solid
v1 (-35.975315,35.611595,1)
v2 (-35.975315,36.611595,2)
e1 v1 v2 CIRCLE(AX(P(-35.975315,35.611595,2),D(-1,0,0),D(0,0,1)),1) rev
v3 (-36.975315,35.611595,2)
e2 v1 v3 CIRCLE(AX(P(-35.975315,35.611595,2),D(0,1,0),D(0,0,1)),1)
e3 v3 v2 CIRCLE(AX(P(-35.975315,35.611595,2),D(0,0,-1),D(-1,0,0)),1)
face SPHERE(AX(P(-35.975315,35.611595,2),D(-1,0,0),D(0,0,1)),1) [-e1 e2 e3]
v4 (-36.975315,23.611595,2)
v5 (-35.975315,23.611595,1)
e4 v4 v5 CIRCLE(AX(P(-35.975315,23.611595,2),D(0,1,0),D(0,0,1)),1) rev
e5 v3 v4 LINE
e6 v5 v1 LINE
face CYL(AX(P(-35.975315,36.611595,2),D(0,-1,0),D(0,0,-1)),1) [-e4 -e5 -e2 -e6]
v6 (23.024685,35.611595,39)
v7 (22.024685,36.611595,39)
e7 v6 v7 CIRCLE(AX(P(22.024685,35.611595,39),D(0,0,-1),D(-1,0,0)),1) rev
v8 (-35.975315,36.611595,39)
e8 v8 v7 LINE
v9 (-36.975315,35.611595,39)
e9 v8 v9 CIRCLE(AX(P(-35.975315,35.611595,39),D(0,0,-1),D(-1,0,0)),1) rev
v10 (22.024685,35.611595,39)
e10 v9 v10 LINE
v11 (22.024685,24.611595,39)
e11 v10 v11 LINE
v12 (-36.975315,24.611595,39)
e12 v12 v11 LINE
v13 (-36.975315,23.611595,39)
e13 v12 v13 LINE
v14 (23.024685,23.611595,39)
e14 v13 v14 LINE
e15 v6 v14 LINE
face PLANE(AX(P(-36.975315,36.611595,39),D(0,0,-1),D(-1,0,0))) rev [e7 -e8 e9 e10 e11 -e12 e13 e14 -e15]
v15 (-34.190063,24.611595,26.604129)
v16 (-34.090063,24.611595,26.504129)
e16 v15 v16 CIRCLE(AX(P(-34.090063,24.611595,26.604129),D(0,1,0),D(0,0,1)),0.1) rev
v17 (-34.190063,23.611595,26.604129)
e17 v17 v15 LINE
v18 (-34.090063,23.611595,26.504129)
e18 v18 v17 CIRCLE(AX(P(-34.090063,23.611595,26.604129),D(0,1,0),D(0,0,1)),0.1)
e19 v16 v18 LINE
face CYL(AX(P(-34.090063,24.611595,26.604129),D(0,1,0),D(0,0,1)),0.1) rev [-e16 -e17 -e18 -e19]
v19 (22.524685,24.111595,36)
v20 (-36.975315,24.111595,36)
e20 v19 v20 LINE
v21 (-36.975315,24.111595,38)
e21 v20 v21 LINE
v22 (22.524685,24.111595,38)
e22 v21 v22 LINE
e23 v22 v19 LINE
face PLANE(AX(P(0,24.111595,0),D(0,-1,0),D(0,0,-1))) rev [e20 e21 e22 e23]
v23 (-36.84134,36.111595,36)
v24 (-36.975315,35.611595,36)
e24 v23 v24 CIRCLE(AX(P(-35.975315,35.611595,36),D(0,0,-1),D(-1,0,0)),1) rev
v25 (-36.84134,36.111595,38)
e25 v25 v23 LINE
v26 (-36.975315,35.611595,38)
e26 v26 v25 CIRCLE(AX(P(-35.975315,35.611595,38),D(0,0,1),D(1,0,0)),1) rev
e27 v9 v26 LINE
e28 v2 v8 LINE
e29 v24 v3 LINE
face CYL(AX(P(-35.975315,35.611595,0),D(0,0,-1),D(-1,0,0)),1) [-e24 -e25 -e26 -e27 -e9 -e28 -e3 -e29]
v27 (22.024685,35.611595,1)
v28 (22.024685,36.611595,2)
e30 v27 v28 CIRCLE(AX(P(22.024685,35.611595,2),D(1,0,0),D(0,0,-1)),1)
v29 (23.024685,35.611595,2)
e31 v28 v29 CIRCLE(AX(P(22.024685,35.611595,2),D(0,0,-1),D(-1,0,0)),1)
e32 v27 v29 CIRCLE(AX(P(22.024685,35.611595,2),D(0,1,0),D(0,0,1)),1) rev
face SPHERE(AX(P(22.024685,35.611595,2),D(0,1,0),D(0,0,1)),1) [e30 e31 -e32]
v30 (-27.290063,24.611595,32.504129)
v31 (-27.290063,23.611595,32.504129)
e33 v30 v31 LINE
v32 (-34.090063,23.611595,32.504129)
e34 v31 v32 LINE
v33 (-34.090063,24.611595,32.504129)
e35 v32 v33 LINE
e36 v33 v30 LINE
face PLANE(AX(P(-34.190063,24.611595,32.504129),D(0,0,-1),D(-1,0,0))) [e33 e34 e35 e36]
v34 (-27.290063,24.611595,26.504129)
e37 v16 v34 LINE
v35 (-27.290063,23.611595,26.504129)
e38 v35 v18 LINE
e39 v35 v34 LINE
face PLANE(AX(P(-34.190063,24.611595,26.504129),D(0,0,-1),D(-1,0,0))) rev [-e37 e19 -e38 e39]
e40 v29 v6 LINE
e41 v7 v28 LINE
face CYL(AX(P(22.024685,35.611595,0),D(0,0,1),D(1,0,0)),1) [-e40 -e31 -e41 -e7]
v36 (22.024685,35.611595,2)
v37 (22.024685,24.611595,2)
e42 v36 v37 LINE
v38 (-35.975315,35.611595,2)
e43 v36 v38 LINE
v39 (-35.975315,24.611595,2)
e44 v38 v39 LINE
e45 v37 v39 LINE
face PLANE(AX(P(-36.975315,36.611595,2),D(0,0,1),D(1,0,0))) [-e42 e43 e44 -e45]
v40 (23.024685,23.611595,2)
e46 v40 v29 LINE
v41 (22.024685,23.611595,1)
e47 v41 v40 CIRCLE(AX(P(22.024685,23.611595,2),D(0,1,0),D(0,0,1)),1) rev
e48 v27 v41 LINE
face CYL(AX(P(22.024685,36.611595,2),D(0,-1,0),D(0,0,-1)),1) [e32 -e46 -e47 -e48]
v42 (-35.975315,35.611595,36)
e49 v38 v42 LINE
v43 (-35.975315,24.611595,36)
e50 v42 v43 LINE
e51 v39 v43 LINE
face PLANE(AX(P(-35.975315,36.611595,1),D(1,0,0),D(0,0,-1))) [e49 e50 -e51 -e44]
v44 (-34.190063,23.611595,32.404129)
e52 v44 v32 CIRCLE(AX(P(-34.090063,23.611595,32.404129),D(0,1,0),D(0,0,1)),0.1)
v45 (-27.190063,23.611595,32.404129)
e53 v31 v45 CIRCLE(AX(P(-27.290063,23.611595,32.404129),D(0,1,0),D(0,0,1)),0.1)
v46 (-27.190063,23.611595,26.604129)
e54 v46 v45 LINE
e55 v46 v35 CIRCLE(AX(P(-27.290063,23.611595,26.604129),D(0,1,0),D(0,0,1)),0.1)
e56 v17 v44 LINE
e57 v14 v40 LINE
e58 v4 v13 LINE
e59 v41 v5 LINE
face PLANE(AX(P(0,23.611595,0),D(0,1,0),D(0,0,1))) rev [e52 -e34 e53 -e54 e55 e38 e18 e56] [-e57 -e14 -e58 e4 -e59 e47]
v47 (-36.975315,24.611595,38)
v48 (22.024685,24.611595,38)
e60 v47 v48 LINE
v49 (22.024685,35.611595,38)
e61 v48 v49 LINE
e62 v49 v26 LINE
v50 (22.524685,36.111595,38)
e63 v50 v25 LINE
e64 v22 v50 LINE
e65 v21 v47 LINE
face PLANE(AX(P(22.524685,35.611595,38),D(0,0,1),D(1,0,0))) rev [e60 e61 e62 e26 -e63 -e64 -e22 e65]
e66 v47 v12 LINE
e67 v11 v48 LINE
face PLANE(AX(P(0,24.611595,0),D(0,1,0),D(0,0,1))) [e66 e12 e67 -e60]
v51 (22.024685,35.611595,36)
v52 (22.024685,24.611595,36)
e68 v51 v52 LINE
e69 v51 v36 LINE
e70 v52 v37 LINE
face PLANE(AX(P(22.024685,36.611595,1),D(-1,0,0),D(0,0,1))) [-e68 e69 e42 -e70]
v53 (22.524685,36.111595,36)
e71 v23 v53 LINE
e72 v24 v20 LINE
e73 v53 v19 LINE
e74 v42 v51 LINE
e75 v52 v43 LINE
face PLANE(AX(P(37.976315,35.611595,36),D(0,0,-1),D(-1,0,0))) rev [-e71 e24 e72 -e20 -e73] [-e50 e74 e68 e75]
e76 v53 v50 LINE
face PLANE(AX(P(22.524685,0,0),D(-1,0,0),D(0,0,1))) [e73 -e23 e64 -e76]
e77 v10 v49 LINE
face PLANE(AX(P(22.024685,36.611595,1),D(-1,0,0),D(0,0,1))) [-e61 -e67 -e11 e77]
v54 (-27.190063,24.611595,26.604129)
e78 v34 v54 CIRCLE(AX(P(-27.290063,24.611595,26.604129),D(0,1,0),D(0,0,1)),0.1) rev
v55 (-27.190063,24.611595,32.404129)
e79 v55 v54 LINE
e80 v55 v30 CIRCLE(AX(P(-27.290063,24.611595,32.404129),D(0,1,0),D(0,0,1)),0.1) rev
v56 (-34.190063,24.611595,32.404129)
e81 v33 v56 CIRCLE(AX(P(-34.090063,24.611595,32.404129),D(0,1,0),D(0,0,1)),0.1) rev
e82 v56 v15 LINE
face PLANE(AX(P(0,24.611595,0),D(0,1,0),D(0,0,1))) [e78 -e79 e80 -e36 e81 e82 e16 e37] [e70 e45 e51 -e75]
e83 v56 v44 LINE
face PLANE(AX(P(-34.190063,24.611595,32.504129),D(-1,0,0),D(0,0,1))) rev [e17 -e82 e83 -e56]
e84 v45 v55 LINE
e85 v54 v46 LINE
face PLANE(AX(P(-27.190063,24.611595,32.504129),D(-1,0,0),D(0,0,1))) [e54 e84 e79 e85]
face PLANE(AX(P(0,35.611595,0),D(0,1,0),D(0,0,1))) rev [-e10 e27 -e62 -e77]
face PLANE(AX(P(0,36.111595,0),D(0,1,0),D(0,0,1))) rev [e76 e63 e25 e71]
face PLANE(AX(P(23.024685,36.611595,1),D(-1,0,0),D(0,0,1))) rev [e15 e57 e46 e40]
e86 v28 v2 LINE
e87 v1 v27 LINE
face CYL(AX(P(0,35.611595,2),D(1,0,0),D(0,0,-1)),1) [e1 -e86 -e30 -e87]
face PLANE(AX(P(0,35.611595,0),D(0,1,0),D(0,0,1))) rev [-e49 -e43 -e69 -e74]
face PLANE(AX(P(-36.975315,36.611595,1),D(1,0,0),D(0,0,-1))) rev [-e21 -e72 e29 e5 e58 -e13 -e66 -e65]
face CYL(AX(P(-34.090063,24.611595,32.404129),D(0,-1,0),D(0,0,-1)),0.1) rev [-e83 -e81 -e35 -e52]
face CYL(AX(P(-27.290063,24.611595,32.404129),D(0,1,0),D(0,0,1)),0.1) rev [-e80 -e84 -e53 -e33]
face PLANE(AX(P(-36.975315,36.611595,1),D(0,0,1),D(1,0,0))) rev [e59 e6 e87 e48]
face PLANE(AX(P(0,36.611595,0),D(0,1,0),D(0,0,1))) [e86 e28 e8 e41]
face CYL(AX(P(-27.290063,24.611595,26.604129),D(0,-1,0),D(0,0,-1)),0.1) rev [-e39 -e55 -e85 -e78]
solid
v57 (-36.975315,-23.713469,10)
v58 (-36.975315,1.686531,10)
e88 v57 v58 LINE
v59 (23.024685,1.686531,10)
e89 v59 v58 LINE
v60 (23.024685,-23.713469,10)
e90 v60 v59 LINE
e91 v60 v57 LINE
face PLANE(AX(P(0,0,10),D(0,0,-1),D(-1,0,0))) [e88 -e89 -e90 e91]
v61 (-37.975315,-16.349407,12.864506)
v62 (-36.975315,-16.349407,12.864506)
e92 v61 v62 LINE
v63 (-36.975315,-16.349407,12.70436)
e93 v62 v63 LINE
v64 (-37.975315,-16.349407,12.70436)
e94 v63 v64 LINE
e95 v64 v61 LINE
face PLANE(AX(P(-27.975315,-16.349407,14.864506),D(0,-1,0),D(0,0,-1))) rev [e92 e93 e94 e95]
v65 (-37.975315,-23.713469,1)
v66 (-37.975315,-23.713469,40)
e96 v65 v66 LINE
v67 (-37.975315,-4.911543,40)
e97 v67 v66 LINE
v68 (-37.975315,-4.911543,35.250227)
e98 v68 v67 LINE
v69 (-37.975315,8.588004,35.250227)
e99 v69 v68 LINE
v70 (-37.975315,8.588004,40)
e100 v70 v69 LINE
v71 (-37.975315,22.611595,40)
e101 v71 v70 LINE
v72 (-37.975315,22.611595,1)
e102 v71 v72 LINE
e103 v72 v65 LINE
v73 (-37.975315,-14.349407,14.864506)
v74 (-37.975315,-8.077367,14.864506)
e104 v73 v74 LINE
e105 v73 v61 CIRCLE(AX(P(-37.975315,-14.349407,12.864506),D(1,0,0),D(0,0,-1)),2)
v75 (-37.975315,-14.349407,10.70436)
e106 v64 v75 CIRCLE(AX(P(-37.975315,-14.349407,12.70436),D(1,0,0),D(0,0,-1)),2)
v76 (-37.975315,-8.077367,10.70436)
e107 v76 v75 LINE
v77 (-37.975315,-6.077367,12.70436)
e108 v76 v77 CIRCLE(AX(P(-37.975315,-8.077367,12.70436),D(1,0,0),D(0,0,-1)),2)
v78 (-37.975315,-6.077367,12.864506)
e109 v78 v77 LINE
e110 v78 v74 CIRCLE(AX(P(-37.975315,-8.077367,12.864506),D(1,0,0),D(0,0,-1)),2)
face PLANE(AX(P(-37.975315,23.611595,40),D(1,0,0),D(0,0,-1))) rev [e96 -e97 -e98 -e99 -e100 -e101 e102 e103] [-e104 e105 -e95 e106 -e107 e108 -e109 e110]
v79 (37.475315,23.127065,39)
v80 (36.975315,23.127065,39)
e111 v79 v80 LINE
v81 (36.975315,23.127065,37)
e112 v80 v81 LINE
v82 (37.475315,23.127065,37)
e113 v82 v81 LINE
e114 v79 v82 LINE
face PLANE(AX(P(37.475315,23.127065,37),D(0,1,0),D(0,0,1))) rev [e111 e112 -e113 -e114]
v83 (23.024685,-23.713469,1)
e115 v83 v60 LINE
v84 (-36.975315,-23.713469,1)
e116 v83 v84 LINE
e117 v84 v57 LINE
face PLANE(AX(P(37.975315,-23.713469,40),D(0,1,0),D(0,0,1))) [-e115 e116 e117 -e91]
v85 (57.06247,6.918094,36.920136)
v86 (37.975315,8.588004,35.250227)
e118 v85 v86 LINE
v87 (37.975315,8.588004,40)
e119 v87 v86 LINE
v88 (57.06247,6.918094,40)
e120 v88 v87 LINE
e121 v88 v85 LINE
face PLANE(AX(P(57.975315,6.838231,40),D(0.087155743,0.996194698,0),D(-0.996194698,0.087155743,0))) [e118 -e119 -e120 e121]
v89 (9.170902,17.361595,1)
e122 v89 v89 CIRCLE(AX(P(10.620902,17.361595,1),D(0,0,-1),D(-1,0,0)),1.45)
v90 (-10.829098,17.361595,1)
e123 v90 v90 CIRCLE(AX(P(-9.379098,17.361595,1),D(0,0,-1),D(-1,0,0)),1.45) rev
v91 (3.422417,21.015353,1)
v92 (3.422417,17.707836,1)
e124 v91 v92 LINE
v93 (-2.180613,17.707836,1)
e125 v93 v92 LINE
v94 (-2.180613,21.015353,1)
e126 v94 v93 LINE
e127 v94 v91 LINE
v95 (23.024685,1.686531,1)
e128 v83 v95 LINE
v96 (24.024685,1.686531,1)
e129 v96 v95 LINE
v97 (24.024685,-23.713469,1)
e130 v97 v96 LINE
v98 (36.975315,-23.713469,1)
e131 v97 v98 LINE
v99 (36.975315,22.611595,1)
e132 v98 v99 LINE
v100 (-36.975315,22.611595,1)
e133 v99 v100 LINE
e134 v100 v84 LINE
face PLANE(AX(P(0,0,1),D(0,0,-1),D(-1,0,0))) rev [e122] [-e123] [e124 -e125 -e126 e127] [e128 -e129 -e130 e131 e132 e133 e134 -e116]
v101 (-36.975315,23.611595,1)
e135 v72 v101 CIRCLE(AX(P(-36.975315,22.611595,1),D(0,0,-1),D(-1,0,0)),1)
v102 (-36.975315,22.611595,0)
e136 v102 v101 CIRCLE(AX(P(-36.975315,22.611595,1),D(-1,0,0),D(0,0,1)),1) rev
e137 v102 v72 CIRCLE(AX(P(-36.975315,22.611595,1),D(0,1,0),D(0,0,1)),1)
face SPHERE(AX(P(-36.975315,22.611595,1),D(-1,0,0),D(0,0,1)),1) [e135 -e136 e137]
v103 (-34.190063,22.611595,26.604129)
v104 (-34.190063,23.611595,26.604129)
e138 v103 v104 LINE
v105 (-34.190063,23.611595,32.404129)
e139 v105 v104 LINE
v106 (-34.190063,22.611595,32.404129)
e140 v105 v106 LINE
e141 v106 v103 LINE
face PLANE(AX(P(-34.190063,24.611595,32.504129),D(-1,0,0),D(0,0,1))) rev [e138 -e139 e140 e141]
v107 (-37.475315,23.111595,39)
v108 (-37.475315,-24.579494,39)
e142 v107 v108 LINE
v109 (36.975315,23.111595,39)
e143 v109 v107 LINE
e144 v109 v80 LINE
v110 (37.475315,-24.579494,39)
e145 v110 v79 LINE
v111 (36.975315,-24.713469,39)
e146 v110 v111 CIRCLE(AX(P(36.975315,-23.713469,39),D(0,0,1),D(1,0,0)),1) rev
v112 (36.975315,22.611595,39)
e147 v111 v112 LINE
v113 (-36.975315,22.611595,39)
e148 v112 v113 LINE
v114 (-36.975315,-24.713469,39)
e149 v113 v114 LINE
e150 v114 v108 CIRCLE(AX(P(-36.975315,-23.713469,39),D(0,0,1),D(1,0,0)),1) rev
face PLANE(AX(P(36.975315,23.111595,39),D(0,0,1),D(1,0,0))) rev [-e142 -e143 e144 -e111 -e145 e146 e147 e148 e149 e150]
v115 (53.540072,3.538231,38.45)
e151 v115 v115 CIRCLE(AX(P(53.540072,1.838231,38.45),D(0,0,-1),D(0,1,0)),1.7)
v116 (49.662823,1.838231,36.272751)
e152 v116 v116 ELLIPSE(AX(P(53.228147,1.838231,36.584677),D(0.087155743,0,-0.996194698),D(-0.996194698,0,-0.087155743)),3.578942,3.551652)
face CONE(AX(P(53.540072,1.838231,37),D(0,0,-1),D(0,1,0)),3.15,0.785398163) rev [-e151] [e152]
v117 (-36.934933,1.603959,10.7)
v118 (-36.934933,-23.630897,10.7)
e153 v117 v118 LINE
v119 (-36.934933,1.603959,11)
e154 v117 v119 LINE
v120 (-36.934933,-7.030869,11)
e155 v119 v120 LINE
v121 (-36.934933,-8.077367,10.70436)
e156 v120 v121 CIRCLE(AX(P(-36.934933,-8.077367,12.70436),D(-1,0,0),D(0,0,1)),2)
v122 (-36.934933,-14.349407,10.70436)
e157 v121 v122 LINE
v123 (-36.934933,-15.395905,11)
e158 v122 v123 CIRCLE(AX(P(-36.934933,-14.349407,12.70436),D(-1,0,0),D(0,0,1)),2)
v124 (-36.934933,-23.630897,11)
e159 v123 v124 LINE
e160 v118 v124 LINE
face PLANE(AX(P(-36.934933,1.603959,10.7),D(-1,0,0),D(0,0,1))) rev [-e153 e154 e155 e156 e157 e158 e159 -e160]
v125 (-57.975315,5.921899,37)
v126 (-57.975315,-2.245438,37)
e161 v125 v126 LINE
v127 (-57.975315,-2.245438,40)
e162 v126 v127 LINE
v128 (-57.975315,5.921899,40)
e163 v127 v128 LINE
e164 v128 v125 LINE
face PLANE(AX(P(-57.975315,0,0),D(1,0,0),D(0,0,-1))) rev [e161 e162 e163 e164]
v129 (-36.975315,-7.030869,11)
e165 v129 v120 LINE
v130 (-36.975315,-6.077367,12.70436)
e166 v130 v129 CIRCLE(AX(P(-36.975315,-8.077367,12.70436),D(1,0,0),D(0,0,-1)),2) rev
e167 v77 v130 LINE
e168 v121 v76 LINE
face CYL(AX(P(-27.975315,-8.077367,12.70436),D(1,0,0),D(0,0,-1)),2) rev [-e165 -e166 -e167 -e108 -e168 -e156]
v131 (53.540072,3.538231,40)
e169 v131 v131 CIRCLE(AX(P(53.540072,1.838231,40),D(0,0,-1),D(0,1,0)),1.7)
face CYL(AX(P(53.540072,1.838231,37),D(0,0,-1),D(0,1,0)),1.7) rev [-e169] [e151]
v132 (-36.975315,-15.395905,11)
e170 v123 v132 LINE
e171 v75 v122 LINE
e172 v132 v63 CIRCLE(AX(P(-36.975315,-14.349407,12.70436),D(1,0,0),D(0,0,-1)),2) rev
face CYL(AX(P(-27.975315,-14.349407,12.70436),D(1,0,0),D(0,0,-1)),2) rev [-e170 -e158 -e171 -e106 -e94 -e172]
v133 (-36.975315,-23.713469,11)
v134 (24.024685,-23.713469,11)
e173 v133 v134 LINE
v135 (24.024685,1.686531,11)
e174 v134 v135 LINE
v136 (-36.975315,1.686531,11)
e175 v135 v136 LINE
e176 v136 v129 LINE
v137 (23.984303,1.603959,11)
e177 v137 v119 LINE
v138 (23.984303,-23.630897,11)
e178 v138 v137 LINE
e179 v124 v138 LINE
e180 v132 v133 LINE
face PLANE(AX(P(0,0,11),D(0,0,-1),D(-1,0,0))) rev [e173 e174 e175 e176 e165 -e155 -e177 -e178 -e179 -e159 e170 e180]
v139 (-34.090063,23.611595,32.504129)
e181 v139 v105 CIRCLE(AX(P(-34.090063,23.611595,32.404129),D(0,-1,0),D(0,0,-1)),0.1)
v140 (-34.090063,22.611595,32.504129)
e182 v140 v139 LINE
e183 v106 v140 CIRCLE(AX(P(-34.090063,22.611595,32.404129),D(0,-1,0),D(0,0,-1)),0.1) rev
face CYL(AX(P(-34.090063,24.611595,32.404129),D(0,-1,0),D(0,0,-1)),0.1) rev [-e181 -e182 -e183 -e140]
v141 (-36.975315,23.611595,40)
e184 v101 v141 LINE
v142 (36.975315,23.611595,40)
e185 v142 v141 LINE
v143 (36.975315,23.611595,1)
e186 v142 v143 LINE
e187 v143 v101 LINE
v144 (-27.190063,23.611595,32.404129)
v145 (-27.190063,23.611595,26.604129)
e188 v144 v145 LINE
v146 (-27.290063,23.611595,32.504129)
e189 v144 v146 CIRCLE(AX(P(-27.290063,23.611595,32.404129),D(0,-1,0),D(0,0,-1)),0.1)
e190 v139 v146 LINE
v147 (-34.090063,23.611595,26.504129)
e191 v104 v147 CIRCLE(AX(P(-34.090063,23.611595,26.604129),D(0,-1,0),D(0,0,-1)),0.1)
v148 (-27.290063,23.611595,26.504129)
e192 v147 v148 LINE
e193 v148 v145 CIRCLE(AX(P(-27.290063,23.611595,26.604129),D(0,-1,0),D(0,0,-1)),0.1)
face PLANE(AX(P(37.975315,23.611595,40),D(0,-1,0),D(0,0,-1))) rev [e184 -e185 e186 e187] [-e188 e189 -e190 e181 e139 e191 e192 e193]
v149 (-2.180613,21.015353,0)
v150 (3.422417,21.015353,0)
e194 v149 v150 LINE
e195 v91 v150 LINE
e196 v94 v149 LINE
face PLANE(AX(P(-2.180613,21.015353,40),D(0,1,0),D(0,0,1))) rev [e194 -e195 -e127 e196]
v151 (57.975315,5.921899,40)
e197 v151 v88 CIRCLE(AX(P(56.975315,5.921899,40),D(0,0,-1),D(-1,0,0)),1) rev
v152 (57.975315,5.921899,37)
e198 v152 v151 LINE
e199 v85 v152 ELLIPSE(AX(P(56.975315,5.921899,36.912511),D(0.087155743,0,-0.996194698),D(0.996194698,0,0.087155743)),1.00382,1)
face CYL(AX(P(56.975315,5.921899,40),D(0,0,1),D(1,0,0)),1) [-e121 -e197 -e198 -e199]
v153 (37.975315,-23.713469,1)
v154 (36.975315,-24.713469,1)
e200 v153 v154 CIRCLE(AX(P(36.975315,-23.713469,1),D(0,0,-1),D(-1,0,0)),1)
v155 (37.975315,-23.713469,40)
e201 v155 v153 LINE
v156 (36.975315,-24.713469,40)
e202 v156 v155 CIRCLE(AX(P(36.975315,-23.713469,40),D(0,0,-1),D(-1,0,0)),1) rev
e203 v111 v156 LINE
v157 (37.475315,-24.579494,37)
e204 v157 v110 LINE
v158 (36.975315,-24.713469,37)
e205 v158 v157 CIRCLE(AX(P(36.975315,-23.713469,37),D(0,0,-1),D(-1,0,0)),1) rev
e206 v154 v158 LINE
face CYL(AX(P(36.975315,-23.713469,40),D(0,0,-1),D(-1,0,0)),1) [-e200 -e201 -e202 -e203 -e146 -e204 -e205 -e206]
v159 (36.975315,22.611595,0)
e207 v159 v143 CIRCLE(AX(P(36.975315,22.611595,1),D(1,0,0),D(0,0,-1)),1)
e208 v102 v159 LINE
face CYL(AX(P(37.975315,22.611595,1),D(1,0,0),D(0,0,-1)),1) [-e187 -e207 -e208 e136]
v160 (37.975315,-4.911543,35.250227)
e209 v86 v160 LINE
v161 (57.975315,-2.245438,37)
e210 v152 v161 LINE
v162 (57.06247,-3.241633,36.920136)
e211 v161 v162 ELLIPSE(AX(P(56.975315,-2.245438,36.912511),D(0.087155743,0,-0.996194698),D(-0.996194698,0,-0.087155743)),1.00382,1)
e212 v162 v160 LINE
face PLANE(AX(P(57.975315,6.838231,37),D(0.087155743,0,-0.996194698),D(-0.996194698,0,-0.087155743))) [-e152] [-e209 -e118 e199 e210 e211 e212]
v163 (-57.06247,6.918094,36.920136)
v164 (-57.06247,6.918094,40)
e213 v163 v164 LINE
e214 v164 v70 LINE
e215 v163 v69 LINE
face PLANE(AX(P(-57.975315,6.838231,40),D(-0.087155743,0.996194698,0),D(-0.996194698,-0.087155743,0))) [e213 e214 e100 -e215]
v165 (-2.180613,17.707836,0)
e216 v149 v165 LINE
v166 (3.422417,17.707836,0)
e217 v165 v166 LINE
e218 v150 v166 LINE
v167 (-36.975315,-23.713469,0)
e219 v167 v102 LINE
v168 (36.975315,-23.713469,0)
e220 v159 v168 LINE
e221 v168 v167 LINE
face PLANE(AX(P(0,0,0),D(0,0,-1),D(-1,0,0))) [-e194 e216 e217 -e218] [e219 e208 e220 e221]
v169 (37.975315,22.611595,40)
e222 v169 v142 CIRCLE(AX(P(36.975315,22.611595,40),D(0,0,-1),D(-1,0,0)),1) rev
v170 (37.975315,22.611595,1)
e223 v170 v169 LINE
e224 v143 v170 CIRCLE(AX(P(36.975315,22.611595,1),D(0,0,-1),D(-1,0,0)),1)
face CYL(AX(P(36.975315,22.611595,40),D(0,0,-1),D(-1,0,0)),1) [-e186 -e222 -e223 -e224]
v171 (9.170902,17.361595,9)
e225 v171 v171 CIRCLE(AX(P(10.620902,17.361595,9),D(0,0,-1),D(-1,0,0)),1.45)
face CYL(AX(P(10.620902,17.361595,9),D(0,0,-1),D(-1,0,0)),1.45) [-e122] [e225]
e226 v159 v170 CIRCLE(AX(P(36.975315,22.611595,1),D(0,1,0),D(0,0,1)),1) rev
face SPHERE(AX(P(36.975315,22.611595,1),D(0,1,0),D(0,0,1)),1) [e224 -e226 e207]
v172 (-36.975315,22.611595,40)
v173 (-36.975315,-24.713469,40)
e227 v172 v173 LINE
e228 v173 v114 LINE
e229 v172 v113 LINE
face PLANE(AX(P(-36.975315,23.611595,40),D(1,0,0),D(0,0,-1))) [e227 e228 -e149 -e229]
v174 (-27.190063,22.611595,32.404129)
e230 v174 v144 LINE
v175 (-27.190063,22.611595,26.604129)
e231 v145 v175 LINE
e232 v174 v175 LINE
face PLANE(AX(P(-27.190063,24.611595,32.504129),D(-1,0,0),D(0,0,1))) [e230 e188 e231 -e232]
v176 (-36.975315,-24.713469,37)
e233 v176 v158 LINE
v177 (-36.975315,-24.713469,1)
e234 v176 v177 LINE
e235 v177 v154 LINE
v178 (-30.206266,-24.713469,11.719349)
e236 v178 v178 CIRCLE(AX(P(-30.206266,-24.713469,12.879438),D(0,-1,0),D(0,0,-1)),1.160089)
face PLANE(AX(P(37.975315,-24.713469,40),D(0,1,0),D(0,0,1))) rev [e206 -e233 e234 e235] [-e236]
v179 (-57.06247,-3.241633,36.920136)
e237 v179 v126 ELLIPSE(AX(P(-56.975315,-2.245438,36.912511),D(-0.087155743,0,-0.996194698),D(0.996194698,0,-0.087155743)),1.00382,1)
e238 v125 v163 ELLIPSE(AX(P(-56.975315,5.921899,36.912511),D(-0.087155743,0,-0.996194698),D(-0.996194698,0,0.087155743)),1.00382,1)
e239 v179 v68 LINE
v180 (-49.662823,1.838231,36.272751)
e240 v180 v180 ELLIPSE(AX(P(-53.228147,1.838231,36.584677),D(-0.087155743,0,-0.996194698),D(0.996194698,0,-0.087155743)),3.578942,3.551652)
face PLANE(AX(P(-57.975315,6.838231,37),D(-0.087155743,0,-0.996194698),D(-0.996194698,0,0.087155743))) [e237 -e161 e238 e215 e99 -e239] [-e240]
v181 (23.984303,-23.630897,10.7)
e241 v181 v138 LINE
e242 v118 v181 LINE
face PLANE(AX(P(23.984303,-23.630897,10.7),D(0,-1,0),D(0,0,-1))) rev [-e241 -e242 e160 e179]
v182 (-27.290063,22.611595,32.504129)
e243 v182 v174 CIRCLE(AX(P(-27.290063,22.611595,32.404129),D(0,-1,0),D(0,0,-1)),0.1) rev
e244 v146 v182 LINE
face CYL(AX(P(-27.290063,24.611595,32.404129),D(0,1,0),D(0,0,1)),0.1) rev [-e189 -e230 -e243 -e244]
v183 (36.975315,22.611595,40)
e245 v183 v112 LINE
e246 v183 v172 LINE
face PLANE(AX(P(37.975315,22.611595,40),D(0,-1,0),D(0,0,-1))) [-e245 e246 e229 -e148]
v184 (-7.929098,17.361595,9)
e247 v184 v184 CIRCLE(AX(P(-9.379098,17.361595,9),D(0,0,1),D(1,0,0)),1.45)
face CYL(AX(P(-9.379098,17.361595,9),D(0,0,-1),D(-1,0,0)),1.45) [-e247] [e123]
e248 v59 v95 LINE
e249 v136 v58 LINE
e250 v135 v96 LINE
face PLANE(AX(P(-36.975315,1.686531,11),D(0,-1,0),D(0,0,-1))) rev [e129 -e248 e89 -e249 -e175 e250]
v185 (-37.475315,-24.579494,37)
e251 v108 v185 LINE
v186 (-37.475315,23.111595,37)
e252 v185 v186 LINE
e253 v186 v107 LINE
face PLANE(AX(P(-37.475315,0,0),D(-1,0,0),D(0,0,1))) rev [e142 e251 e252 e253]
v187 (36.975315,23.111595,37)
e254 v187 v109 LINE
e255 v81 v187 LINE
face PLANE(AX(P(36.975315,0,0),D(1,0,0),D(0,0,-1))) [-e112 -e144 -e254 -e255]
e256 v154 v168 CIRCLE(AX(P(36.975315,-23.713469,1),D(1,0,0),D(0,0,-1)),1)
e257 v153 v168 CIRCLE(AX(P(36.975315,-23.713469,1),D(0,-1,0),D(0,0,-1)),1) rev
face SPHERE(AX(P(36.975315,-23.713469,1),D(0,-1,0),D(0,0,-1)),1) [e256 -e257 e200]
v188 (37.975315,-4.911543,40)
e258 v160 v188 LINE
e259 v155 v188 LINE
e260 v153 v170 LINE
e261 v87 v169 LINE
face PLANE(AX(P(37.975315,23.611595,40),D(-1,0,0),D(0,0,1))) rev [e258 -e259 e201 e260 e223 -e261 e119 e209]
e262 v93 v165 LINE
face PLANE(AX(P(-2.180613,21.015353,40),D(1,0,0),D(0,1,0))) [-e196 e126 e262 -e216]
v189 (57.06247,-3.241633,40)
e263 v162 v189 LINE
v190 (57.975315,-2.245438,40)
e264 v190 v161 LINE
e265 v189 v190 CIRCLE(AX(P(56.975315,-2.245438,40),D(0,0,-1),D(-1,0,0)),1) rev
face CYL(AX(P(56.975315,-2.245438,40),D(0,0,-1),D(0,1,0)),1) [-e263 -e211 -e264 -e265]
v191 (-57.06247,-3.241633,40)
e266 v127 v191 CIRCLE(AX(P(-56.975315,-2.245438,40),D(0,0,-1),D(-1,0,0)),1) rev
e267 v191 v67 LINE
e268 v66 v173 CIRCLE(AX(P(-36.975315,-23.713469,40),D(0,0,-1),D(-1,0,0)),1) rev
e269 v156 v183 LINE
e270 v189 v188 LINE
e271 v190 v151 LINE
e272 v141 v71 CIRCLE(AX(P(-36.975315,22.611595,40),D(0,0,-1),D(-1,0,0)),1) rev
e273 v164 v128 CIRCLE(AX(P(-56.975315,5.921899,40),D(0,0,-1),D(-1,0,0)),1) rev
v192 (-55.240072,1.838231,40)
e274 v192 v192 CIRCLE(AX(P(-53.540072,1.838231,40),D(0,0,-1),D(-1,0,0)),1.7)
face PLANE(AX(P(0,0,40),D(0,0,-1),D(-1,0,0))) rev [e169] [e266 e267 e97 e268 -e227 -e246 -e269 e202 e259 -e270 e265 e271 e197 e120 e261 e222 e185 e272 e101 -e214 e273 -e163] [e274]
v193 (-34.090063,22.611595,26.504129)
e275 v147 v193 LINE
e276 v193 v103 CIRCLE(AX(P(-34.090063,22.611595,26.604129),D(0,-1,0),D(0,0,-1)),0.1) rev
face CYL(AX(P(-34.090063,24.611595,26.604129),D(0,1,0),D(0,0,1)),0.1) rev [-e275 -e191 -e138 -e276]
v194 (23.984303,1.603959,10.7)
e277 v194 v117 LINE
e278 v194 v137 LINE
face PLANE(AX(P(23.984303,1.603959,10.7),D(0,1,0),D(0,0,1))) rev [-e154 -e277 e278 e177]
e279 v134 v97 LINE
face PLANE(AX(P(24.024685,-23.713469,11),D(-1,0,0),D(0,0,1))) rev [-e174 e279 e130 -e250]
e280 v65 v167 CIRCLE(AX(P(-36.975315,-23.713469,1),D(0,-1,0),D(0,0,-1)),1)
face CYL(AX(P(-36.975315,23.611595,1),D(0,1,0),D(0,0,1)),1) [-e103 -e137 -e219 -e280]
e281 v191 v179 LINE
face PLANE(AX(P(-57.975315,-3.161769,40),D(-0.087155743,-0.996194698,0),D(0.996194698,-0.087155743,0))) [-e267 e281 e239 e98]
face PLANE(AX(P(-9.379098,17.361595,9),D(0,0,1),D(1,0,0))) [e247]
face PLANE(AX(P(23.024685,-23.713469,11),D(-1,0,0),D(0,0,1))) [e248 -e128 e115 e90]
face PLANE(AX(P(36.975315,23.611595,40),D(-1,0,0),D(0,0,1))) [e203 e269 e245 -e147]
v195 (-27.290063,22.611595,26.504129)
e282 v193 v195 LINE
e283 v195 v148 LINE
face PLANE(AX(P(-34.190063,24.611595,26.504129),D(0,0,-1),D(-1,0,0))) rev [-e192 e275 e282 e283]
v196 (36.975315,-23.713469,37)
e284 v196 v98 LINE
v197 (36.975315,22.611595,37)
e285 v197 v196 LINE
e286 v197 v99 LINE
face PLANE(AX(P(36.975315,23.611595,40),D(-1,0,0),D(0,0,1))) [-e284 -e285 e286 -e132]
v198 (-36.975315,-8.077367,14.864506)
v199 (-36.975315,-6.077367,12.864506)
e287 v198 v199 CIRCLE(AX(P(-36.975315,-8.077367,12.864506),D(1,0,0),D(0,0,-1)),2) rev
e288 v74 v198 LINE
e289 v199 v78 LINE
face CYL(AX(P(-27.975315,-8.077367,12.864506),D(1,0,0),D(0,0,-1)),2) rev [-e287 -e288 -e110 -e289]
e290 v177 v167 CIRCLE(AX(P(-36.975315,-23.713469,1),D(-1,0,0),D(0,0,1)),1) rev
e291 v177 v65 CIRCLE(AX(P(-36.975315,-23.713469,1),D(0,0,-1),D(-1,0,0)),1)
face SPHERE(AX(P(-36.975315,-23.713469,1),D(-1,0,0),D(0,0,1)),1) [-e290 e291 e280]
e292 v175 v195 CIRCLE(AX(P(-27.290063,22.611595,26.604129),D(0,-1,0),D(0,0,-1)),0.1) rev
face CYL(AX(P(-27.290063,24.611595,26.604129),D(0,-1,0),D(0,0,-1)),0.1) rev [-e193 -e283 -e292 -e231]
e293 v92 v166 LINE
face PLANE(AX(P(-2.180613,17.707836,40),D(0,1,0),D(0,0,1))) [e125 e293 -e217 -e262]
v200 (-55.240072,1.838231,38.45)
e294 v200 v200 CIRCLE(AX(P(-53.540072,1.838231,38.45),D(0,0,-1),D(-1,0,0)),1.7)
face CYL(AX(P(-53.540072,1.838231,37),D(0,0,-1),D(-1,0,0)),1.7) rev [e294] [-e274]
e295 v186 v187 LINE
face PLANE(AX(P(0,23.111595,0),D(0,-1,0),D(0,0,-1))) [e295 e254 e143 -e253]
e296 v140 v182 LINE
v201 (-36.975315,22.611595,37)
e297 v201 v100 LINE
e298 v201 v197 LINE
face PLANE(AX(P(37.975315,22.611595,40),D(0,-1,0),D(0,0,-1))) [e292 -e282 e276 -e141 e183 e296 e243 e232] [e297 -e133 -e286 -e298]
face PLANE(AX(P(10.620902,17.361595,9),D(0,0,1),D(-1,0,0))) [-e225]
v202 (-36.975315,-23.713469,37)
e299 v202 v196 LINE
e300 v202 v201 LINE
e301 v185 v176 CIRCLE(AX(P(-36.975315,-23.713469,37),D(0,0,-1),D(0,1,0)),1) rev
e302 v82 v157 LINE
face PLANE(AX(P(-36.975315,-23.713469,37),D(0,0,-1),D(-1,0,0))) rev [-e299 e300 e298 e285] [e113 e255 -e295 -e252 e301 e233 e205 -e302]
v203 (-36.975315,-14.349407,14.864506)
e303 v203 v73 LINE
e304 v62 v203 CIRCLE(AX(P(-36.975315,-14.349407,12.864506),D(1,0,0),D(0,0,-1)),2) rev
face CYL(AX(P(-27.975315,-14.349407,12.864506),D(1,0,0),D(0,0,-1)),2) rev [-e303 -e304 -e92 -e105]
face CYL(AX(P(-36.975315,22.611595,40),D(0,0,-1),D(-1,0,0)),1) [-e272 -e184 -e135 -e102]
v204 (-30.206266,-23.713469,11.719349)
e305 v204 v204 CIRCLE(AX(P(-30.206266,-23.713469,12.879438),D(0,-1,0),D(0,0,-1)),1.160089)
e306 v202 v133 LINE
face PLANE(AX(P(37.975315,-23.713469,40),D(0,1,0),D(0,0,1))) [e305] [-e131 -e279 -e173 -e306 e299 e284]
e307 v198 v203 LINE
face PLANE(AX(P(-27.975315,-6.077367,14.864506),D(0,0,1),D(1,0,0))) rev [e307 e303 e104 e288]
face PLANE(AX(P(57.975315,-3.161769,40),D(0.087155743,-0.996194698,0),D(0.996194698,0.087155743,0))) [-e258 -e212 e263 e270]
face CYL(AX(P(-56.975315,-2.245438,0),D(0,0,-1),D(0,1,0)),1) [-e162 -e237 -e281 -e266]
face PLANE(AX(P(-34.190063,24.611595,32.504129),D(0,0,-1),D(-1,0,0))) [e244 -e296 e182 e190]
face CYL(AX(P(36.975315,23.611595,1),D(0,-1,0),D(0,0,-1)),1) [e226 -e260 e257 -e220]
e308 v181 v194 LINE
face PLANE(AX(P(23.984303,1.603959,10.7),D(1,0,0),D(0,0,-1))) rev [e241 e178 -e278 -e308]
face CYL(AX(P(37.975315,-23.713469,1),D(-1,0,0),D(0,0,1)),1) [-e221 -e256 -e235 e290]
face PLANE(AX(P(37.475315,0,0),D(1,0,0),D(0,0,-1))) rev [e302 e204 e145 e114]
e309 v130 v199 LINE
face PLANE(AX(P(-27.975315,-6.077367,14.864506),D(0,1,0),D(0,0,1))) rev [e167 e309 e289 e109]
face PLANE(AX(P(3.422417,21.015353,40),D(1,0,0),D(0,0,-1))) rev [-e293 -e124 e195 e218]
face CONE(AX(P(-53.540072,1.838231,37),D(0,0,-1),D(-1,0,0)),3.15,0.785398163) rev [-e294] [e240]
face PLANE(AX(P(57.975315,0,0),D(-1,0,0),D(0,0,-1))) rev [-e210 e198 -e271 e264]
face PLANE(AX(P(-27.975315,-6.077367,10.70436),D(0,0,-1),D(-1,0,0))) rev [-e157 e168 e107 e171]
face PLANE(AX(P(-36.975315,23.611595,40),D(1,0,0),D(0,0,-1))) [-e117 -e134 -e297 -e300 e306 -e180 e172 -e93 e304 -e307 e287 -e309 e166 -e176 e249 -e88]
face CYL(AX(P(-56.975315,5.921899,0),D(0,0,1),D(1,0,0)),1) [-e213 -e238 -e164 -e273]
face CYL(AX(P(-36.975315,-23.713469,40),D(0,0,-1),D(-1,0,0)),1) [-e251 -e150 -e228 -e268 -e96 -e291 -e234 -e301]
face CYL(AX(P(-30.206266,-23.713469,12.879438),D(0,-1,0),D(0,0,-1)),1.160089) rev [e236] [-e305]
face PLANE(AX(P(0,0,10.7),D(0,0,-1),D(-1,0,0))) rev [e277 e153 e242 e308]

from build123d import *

# Parameters (mm, degrees)
ESQUISSE2_W                     = 75.950629162
ESQUISSE2_H                     = 48.325063529
BOSS_EXTRU_1_DEPTH              = 40
COQUE1_T                        = -1
CONG_6_R                        = 1
ESQUISSE3_W                     = 61
ESQUISSE3_H                     = 25.4
BOSS_EXTRU_2_DEPTH              = 10
COQUE3_START                    = -36.975314581
COQUE3_OUTLINE_W                = 25.4
COQUE3_OUTLINE_H                = 9
COQUE3_DEPTH                    = 60
ESQUISSE7_W                     = 60.919236105
ESQUISSE7_H                     = 25.234856741
ENL_V_MAT_EXTRU_3_DEPTH         = 0.3
ESQUISSE8_W                     = 5.603030018
ESQUISSE8_H                     = 3.307516655
ENL_V_MAT_EXTRU_4_DEPTH         = 61.439060764
ESQUISSE9_R                     = 1.45
BOSS_EXTRU_3_DEPTH              = 8
ESQUISSE11_W                    = 60
ESQUISSE11_H                    = 38
BOSS_EXTRU_4_DEPTH              = 13
COQUE7_T                        = -1
ESQUISSE12_W                    = 7
ESQUISSE12_H                    = 6
ENL_V_MAT_EXTRU_6_DEPTH         = 2
CONG_7_R                        = 0.1
CONG_9_R                        = 1
ESQUISSE14_W                    = 73.950629162
ESQUISSE14_H                    = 3
ENL_V_MAT_EXTRU_8_DEPTH         = 1
ESQUISSE18_W                    = 73.950629162
ESQUISSE18_H                    = 2
ENL_V_MAT_EXTRU_13_DEPTH        = 0.5
ESQUISSE19_W                    = 2
ESQUISSE19_H                    = 47.83
ENL_V_MAT_EXTRU_14_DEPTH        = 0.5
ESQUISSE20_W                    = 2
ESQUISSE20_H                    = 47.840534211
ENL_V_MAT_EXTRU_17_DEPTH        = 0.5
ESQUISSE21_W                    = 3
ESQUISSE21_H                    = 11
ENL_V_MAT_EXTRU_18_DEPTH        = 1
ESQUISSE25_W                    = 2
ESQUISSE25_H                    = 11
ENL_V_MAT_EXTRU_19_DEPTH        = 0.5
ESQUISSE26_W                    = 59.5
ESQUISSE26_H                    = 2
ENL_V_MAT_EXTRU_20_DEPTH        = 0.5
ESQUISSE28_W                    = 4.16014579
ESQUISSE28_H                    = 10.272040455
ENL_V_MAT_EXTRU_22_DEPTH        = 10
CONG_10_R                       = 2
ESQUISSE30_W                    = 3
ESQUISSE30_H                    = 10
BOSS_EXTRU_5_DEPTH              = 20
D_POUILLE4_ANGLE                = 5
CONG_11_R                       = 1
D_POUILLE4_OF_SYM_TRIE4_2_ANGLE = 5
CONG_11_OF_SYM_TRIE4_R          = 1
ESQUISSE43_W                    = 59.5
ESQUISSE43_H                    = 2
ENL_V_MAT_EXTRU_23_DEPTH        = 0.5
CONG_12_R                       = 0.1
ESQUISSE50_R                    = 1.160088801
ENL_V_MAT_EXTRU_26_DEPTH        = 1


# Read off the part's stored shape, not the designer's step: Coque3
with BuildPart() as part:
    # Esquisse2 → Boss.-Extru.1 (new body)
    with BuildSketch(Plane.XY):
        with Locations((0, -0.550937207)):
            Rectangle(ESQUISSE2_W, ESQUISSE2_H)
    extrude(amount=BOSS_EXTRU_1_DEPTH)

    # Coque1
    coque1_openings = [part.faces().sort_by_distance(p)[0] for p in [
        (0, -0.550937206, 40),
    ]]
    offset(amount=COQUE1_T, openings=coque1_openings, kind=Kind.INTERSECTION)

    # Congé6
    cong_6_edges = [part.edges().sort_by_distance(p)[0] for p in [
        (0, 23.611594558, 0),
        (37.975314581, -0.550937206, 0),
        (0, -24.713468971, 0),
        (-37.975314581, -0.550937206, 0),
        (-37.975314581, 23.611594558, 20),
        (37.975314581, 23.611594558, 20),
        (37.975314581, -24.713468971, 20),
        (-37.975314581, -24.713468971, 20),
    ]]
    fillet(cong_6_edges, radius=CONG_6_R)

    # Esquisse3 → Boss.-Extru.2 (add)
    with BuildSketch(Plane.XY.offset(1)):
        with Locations((-6.475314581, -11.013468971)):
            Rectangle(ESQUISSE3_W, ESQUISSE3_H)
    extrude(amount=BOSS_EXTRU_2_DEPTH)

    # Coque3 outline → Coque3 (cut)
    with BuildSketch(Plane.YZ.offset(COQUE3_START)):
        with Locations((-11.013468971, 5.5)):
            Rectangle(COQUE3_OUTLINE_W, COQUE3_OUTLINE_H)
    extrude(amount=COQUE3_DEPTH, mode=Mode.SUBTRACT)

    # Esquisse7 → Enlèv. mat.-Extru.3 (cut)
    with BuildSketch(Plane.XY.offset(11)):
        with Locations((-6.475314581, -11.01346897)):
            Rectangle(ESQUISSE7_W, ESQUISSE7_H)
    extrude(amount=-ENL_V_MAT_EXTRU_3_DEPTH, mode=Mode.SUBTRACT)

    # Esquisse8 → Enlèv. mat.-Extru.4 (cut, through all)
    with BuildSketch(Plane(origin=(0, 0, 0), x_dir=(-1, 0, 0), z_dir=(0, 0, -1))):
        with Locations((-0.620902428, 19.361594558)):
            Rectangle(ESQUISSE8_W, ESQUISSE8_H)
    extrude(amount=-ENL_V_MAT_EXTRU_4_DEPTH, mode=Mode.SUBTRACT)

    # Esquisse9 → Boss.-Extru.3 (add)
    with BuildSketch(Plane.XY.offset(1)):
        with Locations(Location((-9.379097572, 17.361594558, 0), (0, 0, 180))):
            Circle(ESQUISSE9_R)
    boss_extru_3 = extrude(amount=BOSS_EXTRU_3_DEPTH)

    # Symétrie2: Boss.-Extru.3 across plane
    add(boss_extru_3.mirror(Plane.ZY.offset(-0.620902428)))


with BuildPart() as body_2:
    # Esquisse11 → Boss.-Extru.4 (new body)
    with BuildSketch(Plane(origin=(0, 23.611594558, 0), x_dir=(1, 0, 0), z_dir=(0, 1, 0))):
        with Locations((-6.975314581, -20)):
            Rectangle(ESQUISSE11_W, ESQUISSE11_H)
    extrude(amount=BOSS_EXTRU_4_DEPTH)

    # Coque7
    coque7_openings = [body_2.faces().sort_by_distance(p)[0] for p in [
        (-6.975314581, 30.111594558, 39),
    ]]
    offset(amount=COQUE7_T, openings=coque7_openings, kind=Kind.INTERSECTION)


with BuildPart() as enl_v_mat_extru_6_tool:
    # Esquisse12 → Enlèv. mat.-Extru.6 (new body)
    with BuildSketch(Plane.XZ.offset(-22.611594558)):
        with Locations((-30.6900627, 29.504129392)):
            Rectangle(ESQUISSE12_W, ESQUISSE12_H)
    extrude(amount=-ENL_V_MAT_EXTRU_6_DEPTH)


with BuildPart() as part_1:
    add(part.part)

    # Enlèv. mat.-Extru.6: cut by enl_v_mat_extru_6_tool
    add(enl_v_mat_extru_6_tool.part, mode=Mode.SUBTRACT)

    # Congé7
    cong_7_edges = [part_1.edges().sort_by_distance(p)[0] for p in [
        (-27.1900627, 23.111594558, 26.504129392),
        (-34.1900627, 23.111594558, 26.504129392),
        (-34.1900627, 23.111594558, 32.504129392),
        (-27.1900627, 23.111594558, 32.504129392),
    ]]
    fillet(cong_7_edges, radius=CONG_7_R)

    # Esquisse14 → Enlèv. mat.-Extru.8 (cut)
    with BuildSketch(Plane(origin=(0, -24.713468971, 0), x_dir=(-1, 0, 0), z_dir=(0, -1, 0))):
        with Locations((0, -38.5)):
            Rectangle(ESQUISSE14_W, ESQUISSE14_H)
    extrude(amount=-ENL_V_MAT_EXTRU_8_DEPTH, mode=Mode.SUBTRACT)

    # Esquisse18 → Enlèv. mat.-Extru.13 (cut)
    with BuildSketch(Plane(origin=(0, 22.611594558, 0), x_dir=(-1, 0, 0), z_dir=(0, -1, 0))):
        with Locations((0, -38)):
            Rectangle(ESQUISSE18_W, ESQUISSE18_H)
    extrude(amount=-ENL_V_MAT_EXTRU_13_DEPTH, mode=Mode.SUBTRACT)

    # Esquisse19 → Enlèv. mat.-Extru.14 (cut)
    with BuildSketch(Plane(origin=(-36.975314581, 0, 0), x_dir=(0, 0, -1), z_dir=(1, 0, 0))):
        with Locations((-38, -0.803405442)):
            Rectangle(ESQUISSE19_W, ESQUISSE19_H)
    extrude(amount=-ENL_V_MAT_EXTRU_14_DEPTH, mode=Mode.SUBTRACT)

    # Esquisse20 → Enlèv. mat.-Extru.17 (cut)
    with BuildSketch(Plane.ZY.offset(-36.975314581)):
        with Locations((38, -0.793201866)):
            Rectangle(ESQUISSE20_W, ESQUISSE20_H)
    extrude(amount=-ENL_V_MAT_EXTRU_17_DEPTH, mode=Mode.SUBTRACT)

    # Esquisse28 → Enlèv. mat.-Extru.22 (cut)
    with BuildSketch(Plane.ZY.offset(37.975314581)):
        with Locations((12.784432773, -11.213387035)):
            Rectangle(ESQUISSE28_W, ESQUISSE28_H)
    extrude(amount=-ENL_V_MAT_EXTRU_22_DEPTH, mode=Mode.SUBTRACT)

    # Congé10
    # the kernel refuses this fillet: 2 mm, written as the material it adds along each edge
    with BuildSketch(Plane(origin=(-37.975314581, -16.349407262, 10.704359878), x_dir=(0, 0, 1), z_dir=(1, 0, 0))) as cong_10_piece_1_section:
        with BuildLine():
            CenterArc((CONG_10_R, -CONG_10_R), CONG_10_R, 90, 90)
            Line((0, -CONG_10_R), (0, 0))
            Line((0, 0), (CONG_10_R, 0))
        make_face()
    cong_10_piece_1 = extrude(amount=1.040381948, mode=Mode.PRIVATE)
    cong_10_piece_1 = split(cong_10_piece_1, bisect_by=Plane(origin=(-36.975314581, -16.116726214, 11.459351222), z_dir=(-1, 0, 0)), keep=Keep.TOP, mode=Mode.PRIVATE)
    cong_10_piece_1 = split(cong_10_piece_1, bisect_by=Plane(origin=(-37.475314581, -16.116726214, 11), z_dir=(0, 0, 1)), keep=Keep.TOP, mode=Mode.PRIVATE)
    add(cong_10_piece_1)
    with BuildSketch(Plane(origin=(-37.975314581, -16.349407262, 10.704359878), x_dir=(0, 0, 1), z_dir=(1, 0, 0))) as cong_10_piece_2_section:
        with BuildLine():
            CenterArc((CONG_10_R, -CONG_10_R), CONG_10_R, 90, 90)
            Line((0, -CONG_10_R), (0, 0))
            Line((0, 0), (CONG_10_R, 0))
        make_face()
    cong_10_piece_2 = extrude(amount=1.040381948, mode=Mode.PRIVATE)
    cong_10_piece_2 = split(cong_10_piece_2, bisect_by=Plane(origin=(-36.975314581, -15.644258666, 10.810672145), z_dir=(-1, 0, 0)), keep=Keep.TOP, mode=Mode.PRIVATE)
    cong_10_piece_2 = split(cong_10_piece_2, bisect_by=Plane(origin=(-37.475314581, -15.644258666, 11), z_dir=(0, 0, -1)), keep=Keep.TOP, mode=Mode.PRIVATE)
    add(cong_10_piece_2)
    with BuildSketch(Plane(origin=(-37.975314581, -16.349407262, 10.704359878), x_dir=(0, 0, 1), z_dir=(1, 0, 0))) as cong_10_piece_3_section:
        with BuildLine():
            CenterArc((CONG_10_R, -CONG_10_R), CONG_10_R, 90, 90)
            Line((0, -CONG_10_R), (0, 0))
            Line((0, 0), (CONG_10_R, 0))
        make_face()
    cong_10_piece_3 = extrude(amount=1.040381948, mode=Mode.PRIVATE)
    cong_10_piece_3 = split(cong_10_piece_3, bisect_by=Plane(origin=(-36.975314581, -15.644258666, 10.810672145), z_dir=(1, 0, 0)), keep=Keep.TOP, mode=Mode.PRIVATE)
    cong_10_piece_3 = split(cong_10_piece_3, bisect_by=Plane(origin=(-36.955123607, -15.644258666, 11), z_dir=(0, 0, -1)), keep=Keep.TOP, mode=Mode.PRIVATE)
    add(cong_10_piece_3)
    with BuildSketch(Plane(origin=(-37.975314581, -16.349407262, 14.864505668), x_dir=(0, 1, 0), z_dir=(1, 0, 0))) as cong_10_piece_4:
        with BuildLine():
            CenterArc((CONG_10_R, -CONG_10_R), CONG_10_R, 90, 90)
            Line((0, -CONG_10_R), (0, 0))
            Line((0, 0), (CONG_10_R, 0))
        make_face()
    extrude(amount=1)
    with BuildSketch(Plane(origin=(-37.975314581, -6.077366807, 10.704359878), x_dir=(0, -1, 0), z_dir=(1, 0, 0))) as cong_10_piece_5_section:
        with BuildLine():
            CenterArc((CONG_10_R, -CONG_10_R), CONG_10_R, 90, 90)
            Line((0, -CONG_10_R), (0, 0))
            Line((0, 0), (CONG_10_R, 0))
        make_face()
    cong_10_piece_5 = extrude(amount=1.040381948, mode=Mode.PRIVATE)
    cong_10_piece_5 = split(cong_10_piece_5, bisect_by=Plane(origin=(-36.975314581, -6.782515403, 10.810672145), z_dir=(-1, 0, 0)), keep=Keep.TOP, mode=Mode.PRIVATE)
    cong_10_piece_5 = split(cong_10_piece_5, bisect_by=Plane(origin=(-37.475314581, -6.782515403, 11), z_dir=(0, 0, -1)), keep=Keep.TOP, mode=Mode.PRIVATE)
    add(cong_10_piece_5)
    with BuildSketch(Plane(origin=(-37.975314581, -6.077366807, 10.704359878), x_dir=(0, -1, 0), z_dir=(1, 0, 0))) as cong_10_piece_6_section:
        with BuildLine():
            CenterArc((CONG_10_R, -CONG_10_R), CONG_10_R, 90, 90)
            Line((0, -CONG_10_R), (0, 0))
            Line((0, 0), (CONG_10_R, 0))
        make_face()
    cong_10_piece_6 = extrude(amount=1.040381948, mode=Mode.PRIVATE)
    cong_10_piece_6 = split(cong_10_piece_6, bisect_by=Plane(origin=(-36.975314581, -6.310047855, 11.459351222), z_dir=(-1, 0, 0)), keep=Keep.TOP, mode=Mode.PRIVATE)
    cong_10_piece_6 = split(cong_10_piece_6, bisect_by=Plane(origin=(-37.475314581, -6.310047855, 11), z_dir=(0, 0, 1)), keep=Keep.TOP, mode=Mode.PRIVATE)
    add(cong_10_piece_6)
    with BuildSketch(Plane(origin=(-37.975314581, -6.077366807, 10.704359878), x_dir=(0, -1, 0), z_dir=(1, 0, 0))) as cong_10_piece_7_section:
        with BuildLine():
            CenterArc((CONG_10_R, -CONG_10_R), CONG_10_R, 90, 90)
            Line((0, -CONG_10_R), (0, 0))
            Line((0, 0), (CONG_10_R, 0))
        make_face()
    cong_10_piece_7 = extrude(amount=1.040381948, mode=Mode.PRIVATE)
    cong_10_piece_7 = split(cong_10_piece_7, bisect_by=Plane(origin=(-36.975314581, -6.782515403, 10.810672145), z_dir=(1, 0, 0)), keep=Keep.TOP, mode=Mode.PRIVATE)
    cong_10_piece_7 = split(cong_10_piece_7, bisect_by=Plane(origin=(-36.955123607, -6.782515403, 11), z_dir=(0, 0, -1)), keep=Keep.TOP, mode=Mode.PRIVATE)
    add(cong_10_piece_7)
    with BuildSketch(Plane(origin=(-37.975314581, -6.077366807, 14.864505668), x_dir=(0, -1, 0), z_dir=(1, 0, 0))) as cong_10_piece_8:
        with BuildLine():
            CenterArc((CONG_10_R, CONG_10_R), CONG_10_R, 180, 90)
            Line((0, CONG_10_R), (0, 0))
            Line((0, 0), (CONG_10_R, 0))
        make_face()
    extrude(amount=1)

    # Esquisse30 → Boss.-Extru.5 (add)
    with BuildSketch(Plane.ZY.offset(37.975314581)):
        with Locations((38.5, 1.83823056)):
            Rectangle(ESQUISSE30_W, ESQUISSE30_H)
    boss_extru_5 = extrude(amount=BOSS_EXTRU_5_DEPTH)

    # Esquisse39 → Fraisage pour vis à tête fraisée M31 (revolve, cut)
    with BuildSketch(Plane(origin=(-53.540071982, 1.83823056, 37), x_dir=(0, 1, 0), z_dir=(1, 0, 0))):
        Polygon((0, 0), (0, 3), (1.7, 3), (1.7, 1.45), (3.15, 0), align=None)
    fraisage_pour_vis_t_te_frais_e_m31 = revolve(axis=Axis((-53.540071982, 1.83823056, 30.65), (0, 0, 1)), mode=Mode.SUBTRACT)

    # Dépouille4
    d_pouille4_faces = [part_1.faces().sort_by_distance(p)[0] for p in [
        (-47.975314581, 6.83823056, 38.5),
        (-46.947833329, 1.83823056, 37),
        (-47.975314581, -3.16176944, 38.5),
    ]]
    draft(d_pouille4_faces, Plane(origin=(-57.975314581, 0, 0), x_dir=(0, 0, -1), z_dir=(-1, 0, 0)), D_POUILLE4_ANGLE)

    # Congé11
    cong_11_edges = [part_1.edges().sort_by_distance(p)[0] for p in [
        (-57.975314581, -3.16176944, 38.5),
        (-57.975314581, 6.83823056, 38.5),
    ]]
    fillet(cong_11_edges, radius=CONG_11_R)

    # Symétrie4: Boss.-Extru.5, Fraisage pour vis à tête fraisée M31 across plane
    add(boss_extru_5.mirror(Plane.ZY))
    add(fraisage_pour_vis_t_te_frais_e_m31.mirror(Plane.ZY), mode=Mode.SUBTRACT)

    # Dépouille4 of Sym_trie4 2
    d_pouille4_of_sym_trie4_2_faces = [part_1.faces().sort_by_distance(p)[0] for p in [
        (47.975314581, 6.83823056, 38.5),
        (46.947833329, 1.83823056, 37),
        (47.975314581, -3.16176944, 38.5),
    ]]
    draft(d_pouille4_of_sym_trie4_2_faces, Plane(origin=(57.975314581, 0, 0), x_dir=(0, 0, -1), z_dir=(1, 0, 0)), D_POUILLE4_OF_SYM_TRIE4_2_ANGLE)

    # Congé11 of Symétrie4
    cong_11_of_sym_trie4_edges = [part_1.edges().sort_by_distance(p)[0] for p in [
        (57.975314581, -3.16176944, 38.5),
        (57.975314581, 6.83823056, 38.5),
    ]]
    fillet(cong_11_of_sym_trie4_edges, radius=CONG_11_OF_SYM_TRIE4_R)

    # Esquisse50 → Enlèv. mat.-Extru.26 (cut)
    with BuildSketch(Plane(origin=(0, -24.713468971, 0), x_dir=(-1, 0, 0), z_dir=(0, -1, 0))):
        with Locations(Location((30.206266219, -12.87943812, 0), (0, 0, 90))):
            Circle(ESQUISSE50_R)
    extrude(amount=-ENL_V_MAT_EXTRU_26_DEPTH, mode=Mode.SUBTRACT)


with BuildPart() as body_2_1:
    add(body_2.part)

    # Enlèv. mat.-Extru.6: cut by enl_v_mat_extru_6_tool
    add(enl_v_mat_extru_6_tool.part, mode=Mode.SUBTRACT)

    # Congé9
    cong_9_edges = [body_2_1.edges().sort_by_distance(p)[0] for p in [
        (23.024685419, 36.611594558, 20),
        (-6.975314581, 36.611594558, 1),
        (-36.975314581, 36.611594558, 20),
        (-36.975314581, 30.111594558, 1),
        (23.024685419, 30.111594558, 1),
    ]]
    fillet(cong_9_edges, radius=CONG_9_R)

    # Esquisse21 → Enlèv. mat.-Extru.18 (cut)
    with BuildSketch(Plane.ZY.offset(36.975314581)):
        with Locations((37.5, 30.111594558)):
            Rectangle(ESQUISSE21_W, ESQUISSE21_H)
    extrude(amount=-ENL_V_MAT_EXTRU_18_DEPTH, mode=Mode.SUBTRACT)

    # Esquisse25 → Enlèv. mat.-Extru.19 (cut)
    with BuildSketch(Plane.ZY.offset(-22.024685419)):
        with Locations((37, 30.111594558)):
            Rectangle(ESQUISSE25_W, ESQUISSE25_H)
    extrude(amount=-ENL_V_MAT_EXTRU_19_DEPTH, mode=Mode.SUBTRACT)

    # Esquisse26 → Enlèv. mat.-Extru.20 (cut)
    with BuildSketch(Plane(origin=(0, 35.611594558, 0), x_dir=(-1, 0, 0), z_dir=(0, -1, 0))):
        with Locations((7.225314581, -37)):
            Rectangle(ESQUISSE26_W, ESQUISSE26_H)
    extrude(amount=-ENL_V_MAT_EXTRU_20_DEPTH, mode=Mode.SUBTRACT)

    # Esquisse43 → Enlèv. mat.-Extru.23 (cut)
    with BuildSketch(Plane(origin=(0, 24.611594558, 0), x_dir=(1, 0, 0), z_dir=(0, 1, 0))):
        with Locations((-7.225314581, -37)):
            Rectangle(ESQUISSE43_W, ESQUISSE43_H)
    extrude(amount=-ENL_V_MAT_EXTRU_23_DEPTH, mode=Mode.SUBTRACT)

    # Congé12
    cong_12_edges = [body_2_1.edges().sort_by_distance(p)[0] for p in [
        (-27.1900627, 24.111594558, 26.504129392),
        (-34.1900627, 24.111594558, 26.504129392),
        (-34.1900627, 24.111594558, 32.504129392),
        (-27.1900627, 24.111594558, 32.504129392),
    ]]
    fillet(cong_12_edges, radius=CONG_12_R)


solid = Compound([part_1.part, body_2_1.part])
